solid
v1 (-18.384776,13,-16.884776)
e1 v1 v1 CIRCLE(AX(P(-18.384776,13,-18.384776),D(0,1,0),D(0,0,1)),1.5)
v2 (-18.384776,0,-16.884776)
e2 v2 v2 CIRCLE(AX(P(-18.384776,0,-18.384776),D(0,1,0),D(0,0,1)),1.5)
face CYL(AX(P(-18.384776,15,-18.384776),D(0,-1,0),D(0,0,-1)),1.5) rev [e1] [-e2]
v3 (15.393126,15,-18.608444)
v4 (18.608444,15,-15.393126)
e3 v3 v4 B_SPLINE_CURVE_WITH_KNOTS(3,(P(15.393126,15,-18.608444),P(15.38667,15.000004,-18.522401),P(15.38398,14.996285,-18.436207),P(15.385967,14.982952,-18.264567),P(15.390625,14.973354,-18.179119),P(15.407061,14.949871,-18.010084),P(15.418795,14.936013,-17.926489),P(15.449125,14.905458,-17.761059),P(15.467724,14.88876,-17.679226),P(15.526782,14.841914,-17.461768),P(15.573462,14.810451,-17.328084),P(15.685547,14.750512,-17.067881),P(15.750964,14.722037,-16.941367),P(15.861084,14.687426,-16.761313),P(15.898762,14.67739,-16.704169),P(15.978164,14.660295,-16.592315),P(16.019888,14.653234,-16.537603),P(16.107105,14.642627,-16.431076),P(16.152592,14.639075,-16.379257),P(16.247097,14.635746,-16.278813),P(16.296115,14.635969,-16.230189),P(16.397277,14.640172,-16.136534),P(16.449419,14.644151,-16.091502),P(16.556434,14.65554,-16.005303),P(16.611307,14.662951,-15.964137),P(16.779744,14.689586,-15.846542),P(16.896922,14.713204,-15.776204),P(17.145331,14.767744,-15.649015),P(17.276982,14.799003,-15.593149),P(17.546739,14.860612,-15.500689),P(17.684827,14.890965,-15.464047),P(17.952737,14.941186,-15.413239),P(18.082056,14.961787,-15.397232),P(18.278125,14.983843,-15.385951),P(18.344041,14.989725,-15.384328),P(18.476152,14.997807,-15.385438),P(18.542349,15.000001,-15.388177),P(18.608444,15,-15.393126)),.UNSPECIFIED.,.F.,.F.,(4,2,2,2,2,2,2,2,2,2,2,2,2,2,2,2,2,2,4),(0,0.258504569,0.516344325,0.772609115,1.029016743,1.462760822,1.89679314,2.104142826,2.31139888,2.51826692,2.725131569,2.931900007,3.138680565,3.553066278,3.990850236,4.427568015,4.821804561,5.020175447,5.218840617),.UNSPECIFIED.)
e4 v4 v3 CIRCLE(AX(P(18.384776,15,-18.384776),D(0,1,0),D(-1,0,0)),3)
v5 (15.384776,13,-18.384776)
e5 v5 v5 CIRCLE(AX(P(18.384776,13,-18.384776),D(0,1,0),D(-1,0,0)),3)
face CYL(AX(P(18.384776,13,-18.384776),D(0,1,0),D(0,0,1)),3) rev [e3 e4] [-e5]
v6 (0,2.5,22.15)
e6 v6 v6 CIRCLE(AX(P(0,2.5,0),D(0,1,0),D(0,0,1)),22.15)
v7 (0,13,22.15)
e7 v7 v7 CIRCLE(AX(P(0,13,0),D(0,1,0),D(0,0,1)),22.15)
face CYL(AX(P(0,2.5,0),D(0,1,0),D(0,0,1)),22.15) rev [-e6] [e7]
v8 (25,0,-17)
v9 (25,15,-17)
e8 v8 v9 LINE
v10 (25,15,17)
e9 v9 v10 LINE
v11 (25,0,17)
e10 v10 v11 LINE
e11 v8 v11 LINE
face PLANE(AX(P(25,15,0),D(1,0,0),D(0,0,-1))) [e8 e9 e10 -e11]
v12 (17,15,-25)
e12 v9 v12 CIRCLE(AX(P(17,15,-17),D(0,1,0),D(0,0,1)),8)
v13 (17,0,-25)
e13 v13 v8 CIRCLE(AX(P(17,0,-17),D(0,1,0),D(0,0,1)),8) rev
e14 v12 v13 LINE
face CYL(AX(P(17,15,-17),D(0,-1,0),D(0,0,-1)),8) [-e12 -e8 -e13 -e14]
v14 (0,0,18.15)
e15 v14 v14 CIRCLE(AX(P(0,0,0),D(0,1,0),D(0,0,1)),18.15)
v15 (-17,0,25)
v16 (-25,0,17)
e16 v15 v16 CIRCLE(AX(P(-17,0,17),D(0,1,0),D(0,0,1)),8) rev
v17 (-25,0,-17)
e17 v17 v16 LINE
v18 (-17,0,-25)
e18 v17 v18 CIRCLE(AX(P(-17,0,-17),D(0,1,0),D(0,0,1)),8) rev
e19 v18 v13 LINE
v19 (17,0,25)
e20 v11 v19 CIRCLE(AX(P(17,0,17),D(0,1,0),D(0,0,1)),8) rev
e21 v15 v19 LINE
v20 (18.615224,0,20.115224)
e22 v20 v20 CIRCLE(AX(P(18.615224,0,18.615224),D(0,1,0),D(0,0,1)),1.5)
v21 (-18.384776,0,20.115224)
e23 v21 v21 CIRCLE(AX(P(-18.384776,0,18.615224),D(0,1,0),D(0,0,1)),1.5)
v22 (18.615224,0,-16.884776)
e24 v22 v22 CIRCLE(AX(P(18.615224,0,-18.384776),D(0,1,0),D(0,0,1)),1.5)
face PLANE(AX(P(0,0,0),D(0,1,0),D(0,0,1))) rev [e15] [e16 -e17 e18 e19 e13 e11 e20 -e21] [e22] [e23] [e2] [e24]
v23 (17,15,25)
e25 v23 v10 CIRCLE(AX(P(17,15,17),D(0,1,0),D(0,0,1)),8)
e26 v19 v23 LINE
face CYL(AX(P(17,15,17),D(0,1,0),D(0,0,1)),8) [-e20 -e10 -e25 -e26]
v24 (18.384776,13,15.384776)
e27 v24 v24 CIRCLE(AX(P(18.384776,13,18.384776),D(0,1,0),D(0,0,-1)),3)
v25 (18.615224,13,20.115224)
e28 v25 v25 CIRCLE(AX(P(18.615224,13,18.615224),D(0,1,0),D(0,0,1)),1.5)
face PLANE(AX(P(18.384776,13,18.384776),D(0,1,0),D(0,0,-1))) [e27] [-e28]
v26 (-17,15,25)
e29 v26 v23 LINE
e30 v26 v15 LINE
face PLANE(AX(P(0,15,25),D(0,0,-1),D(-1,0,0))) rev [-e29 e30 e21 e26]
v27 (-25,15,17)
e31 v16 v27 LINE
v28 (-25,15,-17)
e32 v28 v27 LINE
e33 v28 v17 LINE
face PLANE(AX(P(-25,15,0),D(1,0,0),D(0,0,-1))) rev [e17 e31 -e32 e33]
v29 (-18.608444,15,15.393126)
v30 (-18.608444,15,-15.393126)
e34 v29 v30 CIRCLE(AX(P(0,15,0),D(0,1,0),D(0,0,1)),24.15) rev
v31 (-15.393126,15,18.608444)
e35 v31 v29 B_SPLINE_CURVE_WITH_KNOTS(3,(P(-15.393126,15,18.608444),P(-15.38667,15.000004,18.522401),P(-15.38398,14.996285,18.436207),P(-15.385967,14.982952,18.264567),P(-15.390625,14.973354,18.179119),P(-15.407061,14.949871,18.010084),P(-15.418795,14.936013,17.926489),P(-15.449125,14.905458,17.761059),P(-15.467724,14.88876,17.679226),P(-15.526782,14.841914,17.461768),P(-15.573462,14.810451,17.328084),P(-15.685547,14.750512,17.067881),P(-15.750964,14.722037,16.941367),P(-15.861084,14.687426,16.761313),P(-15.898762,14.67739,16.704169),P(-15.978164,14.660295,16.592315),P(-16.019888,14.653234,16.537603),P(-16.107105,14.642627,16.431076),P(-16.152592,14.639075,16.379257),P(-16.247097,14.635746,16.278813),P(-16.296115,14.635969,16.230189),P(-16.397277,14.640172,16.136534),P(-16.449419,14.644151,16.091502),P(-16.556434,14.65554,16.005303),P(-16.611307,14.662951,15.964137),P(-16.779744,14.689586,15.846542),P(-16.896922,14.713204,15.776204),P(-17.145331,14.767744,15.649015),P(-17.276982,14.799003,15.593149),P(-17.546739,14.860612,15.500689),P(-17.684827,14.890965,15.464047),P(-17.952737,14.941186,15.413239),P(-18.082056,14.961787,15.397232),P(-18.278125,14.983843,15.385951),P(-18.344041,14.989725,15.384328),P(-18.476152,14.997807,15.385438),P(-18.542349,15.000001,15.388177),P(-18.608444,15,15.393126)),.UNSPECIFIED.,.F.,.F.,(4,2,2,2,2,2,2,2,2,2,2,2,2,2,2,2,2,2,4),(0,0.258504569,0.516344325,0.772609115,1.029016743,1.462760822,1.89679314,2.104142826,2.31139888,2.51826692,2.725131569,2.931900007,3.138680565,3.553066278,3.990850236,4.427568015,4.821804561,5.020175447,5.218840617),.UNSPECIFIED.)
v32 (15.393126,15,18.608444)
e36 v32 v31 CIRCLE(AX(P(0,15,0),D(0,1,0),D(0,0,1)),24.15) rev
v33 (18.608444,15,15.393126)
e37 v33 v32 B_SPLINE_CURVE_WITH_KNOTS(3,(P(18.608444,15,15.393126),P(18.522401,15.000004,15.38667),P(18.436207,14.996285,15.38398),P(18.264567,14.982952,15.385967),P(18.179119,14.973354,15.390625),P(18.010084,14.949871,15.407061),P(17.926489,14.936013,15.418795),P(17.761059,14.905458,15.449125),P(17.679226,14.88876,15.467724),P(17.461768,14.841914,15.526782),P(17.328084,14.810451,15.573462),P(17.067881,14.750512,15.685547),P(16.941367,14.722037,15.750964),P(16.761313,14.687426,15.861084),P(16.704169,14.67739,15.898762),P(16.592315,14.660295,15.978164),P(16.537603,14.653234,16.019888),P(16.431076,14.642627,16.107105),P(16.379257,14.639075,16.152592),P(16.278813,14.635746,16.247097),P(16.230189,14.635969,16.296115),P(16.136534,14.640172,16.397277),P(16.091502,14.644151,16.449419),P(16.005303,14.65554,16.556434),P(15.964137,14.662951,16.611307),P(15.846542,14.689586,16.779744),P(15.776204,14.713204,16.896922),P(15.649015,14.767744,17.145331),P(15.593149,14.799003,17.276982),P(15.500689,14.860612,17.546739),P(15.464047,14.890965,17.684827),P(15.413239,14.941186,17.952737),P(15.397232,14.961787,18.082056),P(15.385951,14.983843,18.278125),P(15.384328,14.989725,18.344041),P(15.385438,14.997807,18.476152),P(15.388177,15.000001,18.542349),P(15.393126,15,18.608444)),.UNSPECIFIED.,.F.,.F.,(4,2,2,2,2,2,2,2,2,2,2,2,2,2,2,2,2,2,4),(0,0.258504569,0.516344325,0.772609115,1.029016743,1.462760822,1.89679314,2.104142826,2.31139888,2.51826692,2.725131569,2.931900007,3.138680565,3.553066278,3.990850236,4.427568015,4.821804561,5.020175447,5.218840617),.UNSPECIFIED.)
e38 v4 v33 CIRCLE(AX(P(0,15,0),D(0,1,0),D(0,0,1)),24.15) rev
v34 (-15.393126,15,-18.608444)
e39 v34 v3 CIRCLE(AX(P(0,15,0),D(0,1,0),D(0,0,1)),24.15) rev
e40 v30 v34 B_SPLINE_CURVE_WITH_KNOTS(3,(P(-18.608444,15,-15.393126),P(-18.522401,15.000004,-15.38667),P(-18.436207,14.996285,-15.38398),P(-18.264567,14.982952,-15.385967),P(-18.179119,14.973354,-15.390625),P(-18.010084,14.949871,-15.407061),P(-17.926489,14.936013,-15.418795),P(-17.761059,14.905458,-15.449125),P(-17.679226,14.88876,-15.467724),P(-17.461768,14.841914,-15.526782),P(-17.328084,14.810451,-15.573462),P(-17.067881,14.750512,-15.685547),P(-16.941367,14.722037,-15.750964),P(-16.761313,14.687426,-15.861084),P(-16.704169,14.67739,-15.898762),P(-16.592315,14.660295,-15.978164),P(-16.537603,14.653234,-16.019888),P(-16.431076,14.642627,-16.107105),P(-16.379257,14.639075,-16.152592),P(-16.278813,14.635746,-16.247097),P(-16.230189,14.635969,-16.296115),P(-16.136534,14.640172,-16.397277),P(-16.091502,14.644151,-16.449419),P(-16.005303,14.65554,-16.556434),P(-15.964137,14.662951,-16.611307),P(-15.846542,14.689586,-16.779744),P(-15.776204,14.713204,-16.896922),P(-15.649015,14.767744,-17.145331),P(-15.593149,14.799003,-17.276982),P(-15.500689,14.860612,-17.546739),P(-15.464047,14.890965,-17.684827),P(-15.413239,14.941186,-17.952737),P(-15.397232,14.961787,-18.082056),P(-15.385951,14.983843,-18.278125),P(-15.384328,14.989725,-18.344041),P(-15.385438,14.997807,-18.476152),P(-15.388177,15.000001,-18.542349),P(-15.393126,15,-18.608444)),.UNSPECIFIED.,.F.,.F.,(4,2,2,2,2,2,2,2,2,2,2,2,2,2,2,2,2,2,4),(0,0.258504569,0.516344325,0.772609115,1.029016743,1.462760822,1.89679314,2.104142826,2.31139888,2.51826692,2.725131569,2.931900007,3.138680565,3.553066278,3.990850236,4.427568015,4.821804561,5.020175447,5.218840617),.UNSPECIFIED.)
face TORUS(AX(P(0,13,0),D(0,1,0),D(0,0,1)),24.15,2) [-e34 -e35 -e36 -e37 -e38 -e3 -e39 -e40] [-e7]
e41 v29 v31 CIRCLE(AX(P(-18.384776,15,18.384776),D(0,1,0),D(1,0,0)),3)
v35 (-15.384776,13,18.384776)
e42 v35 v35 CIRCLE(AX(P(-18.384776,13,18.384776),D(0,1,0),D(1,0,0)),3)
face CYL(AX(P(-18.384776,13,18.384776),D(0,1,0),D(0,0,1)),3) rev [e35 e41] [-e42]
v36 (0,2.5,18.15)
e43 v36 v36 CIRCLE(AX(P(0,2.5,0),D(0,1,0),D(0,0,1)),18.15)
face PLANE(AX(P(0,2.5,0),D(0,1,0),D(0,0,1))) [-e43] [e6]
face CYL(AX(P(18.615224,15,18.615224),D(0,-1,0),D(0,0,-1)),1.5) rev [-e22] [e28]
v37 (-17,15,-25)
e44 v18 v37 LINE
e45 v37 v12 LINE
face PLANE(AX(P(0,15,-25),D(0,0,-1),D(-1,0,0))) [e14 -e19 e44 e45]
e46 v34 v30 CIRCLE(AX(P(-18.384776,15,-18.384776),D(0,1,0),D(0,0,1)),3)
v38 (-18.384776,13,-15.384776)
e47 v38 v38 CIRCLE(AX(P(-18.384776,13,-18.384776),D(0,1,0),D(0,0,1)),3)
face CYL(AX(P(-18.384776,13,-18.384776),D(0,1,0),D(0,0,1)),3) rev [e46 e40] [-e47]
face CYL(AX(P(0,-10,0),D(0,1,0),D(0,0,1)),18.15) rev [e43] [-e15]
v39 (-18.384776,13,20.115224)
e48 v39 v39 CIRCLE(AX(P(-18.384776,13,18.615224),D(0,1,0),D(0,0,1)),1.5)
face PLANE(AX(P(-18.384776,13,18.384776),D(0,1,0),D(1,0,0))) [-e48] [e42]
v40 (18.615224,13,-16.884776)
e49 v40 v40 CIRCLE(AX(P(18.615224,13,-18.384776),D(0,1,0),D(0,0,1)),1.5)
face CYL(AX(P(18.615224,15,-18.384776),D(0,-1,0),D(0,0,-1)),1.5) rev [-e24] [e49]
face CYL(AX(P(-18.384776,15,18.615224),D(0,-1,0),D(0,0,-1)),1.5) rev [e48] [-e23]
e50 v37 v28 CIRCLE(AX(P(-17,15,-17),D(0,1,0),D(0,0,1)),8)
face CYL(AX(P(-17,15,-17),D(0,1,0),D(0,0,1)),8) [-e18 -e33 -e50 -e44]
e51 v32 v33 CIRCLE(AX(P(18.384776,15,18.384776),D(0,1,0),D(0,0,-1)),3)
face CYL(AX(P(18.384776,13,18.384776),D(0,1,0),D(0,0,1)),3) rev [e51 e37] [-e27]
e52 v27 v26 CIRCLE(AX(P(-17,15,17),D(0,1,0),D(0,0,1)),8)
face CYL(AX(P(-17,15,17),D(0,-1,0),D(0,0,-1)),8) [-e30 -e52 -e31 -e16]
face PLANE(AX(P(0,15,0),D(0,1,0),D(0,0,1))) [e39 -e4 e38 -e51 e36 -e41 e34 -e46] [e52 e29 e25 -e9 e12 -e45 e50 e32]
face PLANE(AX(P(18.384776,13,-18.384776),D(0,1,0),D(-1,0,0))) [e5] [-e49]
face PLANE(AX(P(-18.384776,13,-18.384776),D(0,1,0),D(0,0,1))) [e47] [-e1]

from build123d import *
from build123d.topology import SkipClean

# Parameters (mm, degrees)
SKETCH_1_R               = 25
EXTRUDE_1_DEPTH          = 15
SKETCH_2_R               = 22.15
CUT_EXTRUDE_1_DEPTH      = 12.5
SKETCH_3_R               = 18.15
CUT_EXTRUDE_2_DEPTH      = 12.5
EXTRUDE_2_DEPTH          = 15
FILLET_1_R               = 8
CUT_EXTRUDE_START        = -15
SKETCH_5_R               = 1.5
CUT_EXTRUDE_3_DEPTH      = 15
SKETCH_6_R               = 3
CUT_EXTRUDE_4_DEPTH      = 2
PATTERN_CIRCULAR_1_COUNT = 4
FILLET_2_R               = 2


with BuildPart() as part:
    # 草图1 → 凸台-拉伸1 (new body)
    with BuildSketch(Plane(origin=(0, 0, 0), x_dir=(1, 0, 0), z_dir=(0, 1, 0))):
        with Locations(Location((0, 0, 0), (0, 0, 270))):
            Circle(SKETCH_1_R)
    extrude(amount=EXTRUDE_1_DEPTH)

    # 草图2 → 切除-拉伸1 (cut)
    with BuildSketch(Plane(origin=(0, 15, 0), x_dir=(1, 0, 0), z_dir=(0, 1, 0))):
        with Locations(Location((0, 0, 0), (0, 0, 270))):
            Circle(SKETCH_2_R)
    extrude(amount=-CUT_EXTRUDE_1_DEPTH, mode=Mode.SUBTRACT)

    # 草图3 → 切除-拉伸2 (cut)
    with BuildSketch(Plane(origin=(0, 2.5, 0), x_dir=(1, 0, 0), z_dir=(0, 1, 0))):
        with Locations(Location((0, 0, 0), (0, 0, 270))):
            Circle(SKETCH_3_R)
    extrude(amount=-CUT_EXTRUDE_2_DEPTH, mode=Mode.SUBTRACT)

    # 草图4 → 凸台-拉伸2 (add)
    with BuildSketch(Plane(origin=(0, 0, 0), x_dir=(1, 0, 0), z_dir=(0, 1, 0))):
        with BuildLine():
            Line((0, 25), (-25, 25))
            Line((-25, 25), (-25, 2.6e-08))
            ThreePointArc((-25, 2.6e-08), (-23.301207713, 9.058350794), (-18.435702489, 16.885641052))
            ThreePointArc((-18.435702489, 16.885641052), (-19.445436483, 19.445436483), (-16.885641052, 18.435702489))
            ThreePointArc((-16.885641052, 18.435702489), (-9.058350782, 23.301207718), (0, 25))
        make_face()
        with BuildLine():
            Line((25, 25), (0, 25))
            ThreePointArc((0, 25), (9.210354363, 23.241544108), (17.125028574, 18.213549801))
            ThreePointArc((17.125028574, 18.213549801), (19.682469279, 19.438809921), (18.425448396, 16.896829626))
            ThreePointArc((18.425448396, 16.896829626), (23.298457137, 9.065423048), (25, 0))
            Line((25, 0), (25, 25))
        make_face()
        with BuildLine():
            ThreePointArc((-18.213549801, -17.125028574), (-23.241544113, -9.210354351), (-25, 2.6e-08))
            Line((-25, 2.6e-08), (-25, -25))
            Line((-25, -25), (-5.8e-08, -25))
            ThreePointArc((-5.8e-08, -25), (-9.065423076, -23.298457126), (-16.896829626, -18.425448396))
            ThreePointArc((-16.896829626, -18.425448396), (-19.438809921, -19.682469279), (-18.213549801, -17.125028574))
        make_face()
        with BuildLine():
            Line((25, -25), (25, 0))
            ThreePointArc((25, 0), (23.22561674, -9.250444694), (18.154341838, -17.18778265))
            ThreePointArc((18.154341838, -17.18778265), (19.675883861, -19.675883861), (17.18778265, -18.154341838))
            ThreePointArc((17.18778265, -18.154341838), (9.250444666, -23.225616751), (-5.8e-08, -25))
            Line((-5.8e-08, -25), (25, -25))
        make_face()
    extrude(amount=EXTRUDE_2_DEPTH)

    # 圆角1
    fillet_1_edges = [part.edges().sort_by_distance(p)[0] for p in [
        (-25, 7.5, -25),
        (25, 7.5, -25),
        (-25, 7.5, 25),
        (25, 7.5, 25),
    ]]
    fillet(fillet_1_edges, radius=FILLET_1_R)

    # 草图5 → 切除-拉伸3 (cut)
    with BuildSketch(Plane(origin=(0, 15, 0), x_dir=(1, 0, 0), z_dir=(0, 1, 0)).offset(CUT_EXTRUDE_START)):
        with Locations(Location((-18.384776311, 18.384776311, 0), (0, 0, 270))):
            Circle(SKETCH_5_R)
        with Locations(Location((18.615223689, 18.384776311, 0), (0, 0, 270))):
            Circle(SKETCH_5_R)
        with Locations(Location((18.615223689, -18.615223689, 0), (0, 0, 270))):
            Circle(SKETCH_5_R)
        with Locations(Location((-18.384776311, -18.615223689, 0), (0, 0, 270))):
            Circle(SKETCH_5_R)
    extrude(amount=CUT_EXTRUDE_3_DEPTH, mode=Mode.SUBTRACT)

    # 草图6 → 切除-拉伸4 (cut)
    with BuildSketch(Plane(origin=(0, 15, 0), x_dir=(1, 0, 0), z_dir=(0, 1, 0))):
        with Locations(Location((-18.384776311, 18.384776311, 0), (0, 0, 270))):
            Circle(SKETCH_6_R)
    cut_extrude_4 = extrude(amount=-CUT_EXTRUDE_4_DEPTH, mode=Mode.SUBTRACT)

    # 阵列(圆周)1: 切除-拉伸4 ×4 about axis
    with SkipClean():  # the faces are left unmerged after this step: merging them gives an invalid solid
        pattern_circular_1_axis = Axis((0, 0, 0), (0, 1, 0))
        for i in range(1, PATTERN_CIRCULAR_1_COUNT):
            add(cut_extrude_4.rotate(pattern_circular_1_axis, i * 360 / PATTERN_CIRCULAR_1_COUNT), mode=Mode.SUBTRACT)

    # 圆角2
    # the kernel refuses this fillet: 2 mm, written as the material it takes off along each edge
    with BuildSketch(Plane(origin=(0, 15, 0), x_dir=(0, 0, 1), z_dir=(-1, 0, 0))) as fillet_2_piece_1:
        with BuildLine():
            CenterArc((22.15 + FILLET_2_R, -FILLET_2_R), FILLET_2_R, 90, 90)
            Line((22.15, -FILLET_2_R), (22.15, 0))
            Line((22.15, 0), (22.15 + FILLET_2_R, 0))
        make_face()
    revolve(axis=Axis((0, 15, 0), (0, 1, 0)), mode=Mode.SUBTRACT)


solid = part.part
